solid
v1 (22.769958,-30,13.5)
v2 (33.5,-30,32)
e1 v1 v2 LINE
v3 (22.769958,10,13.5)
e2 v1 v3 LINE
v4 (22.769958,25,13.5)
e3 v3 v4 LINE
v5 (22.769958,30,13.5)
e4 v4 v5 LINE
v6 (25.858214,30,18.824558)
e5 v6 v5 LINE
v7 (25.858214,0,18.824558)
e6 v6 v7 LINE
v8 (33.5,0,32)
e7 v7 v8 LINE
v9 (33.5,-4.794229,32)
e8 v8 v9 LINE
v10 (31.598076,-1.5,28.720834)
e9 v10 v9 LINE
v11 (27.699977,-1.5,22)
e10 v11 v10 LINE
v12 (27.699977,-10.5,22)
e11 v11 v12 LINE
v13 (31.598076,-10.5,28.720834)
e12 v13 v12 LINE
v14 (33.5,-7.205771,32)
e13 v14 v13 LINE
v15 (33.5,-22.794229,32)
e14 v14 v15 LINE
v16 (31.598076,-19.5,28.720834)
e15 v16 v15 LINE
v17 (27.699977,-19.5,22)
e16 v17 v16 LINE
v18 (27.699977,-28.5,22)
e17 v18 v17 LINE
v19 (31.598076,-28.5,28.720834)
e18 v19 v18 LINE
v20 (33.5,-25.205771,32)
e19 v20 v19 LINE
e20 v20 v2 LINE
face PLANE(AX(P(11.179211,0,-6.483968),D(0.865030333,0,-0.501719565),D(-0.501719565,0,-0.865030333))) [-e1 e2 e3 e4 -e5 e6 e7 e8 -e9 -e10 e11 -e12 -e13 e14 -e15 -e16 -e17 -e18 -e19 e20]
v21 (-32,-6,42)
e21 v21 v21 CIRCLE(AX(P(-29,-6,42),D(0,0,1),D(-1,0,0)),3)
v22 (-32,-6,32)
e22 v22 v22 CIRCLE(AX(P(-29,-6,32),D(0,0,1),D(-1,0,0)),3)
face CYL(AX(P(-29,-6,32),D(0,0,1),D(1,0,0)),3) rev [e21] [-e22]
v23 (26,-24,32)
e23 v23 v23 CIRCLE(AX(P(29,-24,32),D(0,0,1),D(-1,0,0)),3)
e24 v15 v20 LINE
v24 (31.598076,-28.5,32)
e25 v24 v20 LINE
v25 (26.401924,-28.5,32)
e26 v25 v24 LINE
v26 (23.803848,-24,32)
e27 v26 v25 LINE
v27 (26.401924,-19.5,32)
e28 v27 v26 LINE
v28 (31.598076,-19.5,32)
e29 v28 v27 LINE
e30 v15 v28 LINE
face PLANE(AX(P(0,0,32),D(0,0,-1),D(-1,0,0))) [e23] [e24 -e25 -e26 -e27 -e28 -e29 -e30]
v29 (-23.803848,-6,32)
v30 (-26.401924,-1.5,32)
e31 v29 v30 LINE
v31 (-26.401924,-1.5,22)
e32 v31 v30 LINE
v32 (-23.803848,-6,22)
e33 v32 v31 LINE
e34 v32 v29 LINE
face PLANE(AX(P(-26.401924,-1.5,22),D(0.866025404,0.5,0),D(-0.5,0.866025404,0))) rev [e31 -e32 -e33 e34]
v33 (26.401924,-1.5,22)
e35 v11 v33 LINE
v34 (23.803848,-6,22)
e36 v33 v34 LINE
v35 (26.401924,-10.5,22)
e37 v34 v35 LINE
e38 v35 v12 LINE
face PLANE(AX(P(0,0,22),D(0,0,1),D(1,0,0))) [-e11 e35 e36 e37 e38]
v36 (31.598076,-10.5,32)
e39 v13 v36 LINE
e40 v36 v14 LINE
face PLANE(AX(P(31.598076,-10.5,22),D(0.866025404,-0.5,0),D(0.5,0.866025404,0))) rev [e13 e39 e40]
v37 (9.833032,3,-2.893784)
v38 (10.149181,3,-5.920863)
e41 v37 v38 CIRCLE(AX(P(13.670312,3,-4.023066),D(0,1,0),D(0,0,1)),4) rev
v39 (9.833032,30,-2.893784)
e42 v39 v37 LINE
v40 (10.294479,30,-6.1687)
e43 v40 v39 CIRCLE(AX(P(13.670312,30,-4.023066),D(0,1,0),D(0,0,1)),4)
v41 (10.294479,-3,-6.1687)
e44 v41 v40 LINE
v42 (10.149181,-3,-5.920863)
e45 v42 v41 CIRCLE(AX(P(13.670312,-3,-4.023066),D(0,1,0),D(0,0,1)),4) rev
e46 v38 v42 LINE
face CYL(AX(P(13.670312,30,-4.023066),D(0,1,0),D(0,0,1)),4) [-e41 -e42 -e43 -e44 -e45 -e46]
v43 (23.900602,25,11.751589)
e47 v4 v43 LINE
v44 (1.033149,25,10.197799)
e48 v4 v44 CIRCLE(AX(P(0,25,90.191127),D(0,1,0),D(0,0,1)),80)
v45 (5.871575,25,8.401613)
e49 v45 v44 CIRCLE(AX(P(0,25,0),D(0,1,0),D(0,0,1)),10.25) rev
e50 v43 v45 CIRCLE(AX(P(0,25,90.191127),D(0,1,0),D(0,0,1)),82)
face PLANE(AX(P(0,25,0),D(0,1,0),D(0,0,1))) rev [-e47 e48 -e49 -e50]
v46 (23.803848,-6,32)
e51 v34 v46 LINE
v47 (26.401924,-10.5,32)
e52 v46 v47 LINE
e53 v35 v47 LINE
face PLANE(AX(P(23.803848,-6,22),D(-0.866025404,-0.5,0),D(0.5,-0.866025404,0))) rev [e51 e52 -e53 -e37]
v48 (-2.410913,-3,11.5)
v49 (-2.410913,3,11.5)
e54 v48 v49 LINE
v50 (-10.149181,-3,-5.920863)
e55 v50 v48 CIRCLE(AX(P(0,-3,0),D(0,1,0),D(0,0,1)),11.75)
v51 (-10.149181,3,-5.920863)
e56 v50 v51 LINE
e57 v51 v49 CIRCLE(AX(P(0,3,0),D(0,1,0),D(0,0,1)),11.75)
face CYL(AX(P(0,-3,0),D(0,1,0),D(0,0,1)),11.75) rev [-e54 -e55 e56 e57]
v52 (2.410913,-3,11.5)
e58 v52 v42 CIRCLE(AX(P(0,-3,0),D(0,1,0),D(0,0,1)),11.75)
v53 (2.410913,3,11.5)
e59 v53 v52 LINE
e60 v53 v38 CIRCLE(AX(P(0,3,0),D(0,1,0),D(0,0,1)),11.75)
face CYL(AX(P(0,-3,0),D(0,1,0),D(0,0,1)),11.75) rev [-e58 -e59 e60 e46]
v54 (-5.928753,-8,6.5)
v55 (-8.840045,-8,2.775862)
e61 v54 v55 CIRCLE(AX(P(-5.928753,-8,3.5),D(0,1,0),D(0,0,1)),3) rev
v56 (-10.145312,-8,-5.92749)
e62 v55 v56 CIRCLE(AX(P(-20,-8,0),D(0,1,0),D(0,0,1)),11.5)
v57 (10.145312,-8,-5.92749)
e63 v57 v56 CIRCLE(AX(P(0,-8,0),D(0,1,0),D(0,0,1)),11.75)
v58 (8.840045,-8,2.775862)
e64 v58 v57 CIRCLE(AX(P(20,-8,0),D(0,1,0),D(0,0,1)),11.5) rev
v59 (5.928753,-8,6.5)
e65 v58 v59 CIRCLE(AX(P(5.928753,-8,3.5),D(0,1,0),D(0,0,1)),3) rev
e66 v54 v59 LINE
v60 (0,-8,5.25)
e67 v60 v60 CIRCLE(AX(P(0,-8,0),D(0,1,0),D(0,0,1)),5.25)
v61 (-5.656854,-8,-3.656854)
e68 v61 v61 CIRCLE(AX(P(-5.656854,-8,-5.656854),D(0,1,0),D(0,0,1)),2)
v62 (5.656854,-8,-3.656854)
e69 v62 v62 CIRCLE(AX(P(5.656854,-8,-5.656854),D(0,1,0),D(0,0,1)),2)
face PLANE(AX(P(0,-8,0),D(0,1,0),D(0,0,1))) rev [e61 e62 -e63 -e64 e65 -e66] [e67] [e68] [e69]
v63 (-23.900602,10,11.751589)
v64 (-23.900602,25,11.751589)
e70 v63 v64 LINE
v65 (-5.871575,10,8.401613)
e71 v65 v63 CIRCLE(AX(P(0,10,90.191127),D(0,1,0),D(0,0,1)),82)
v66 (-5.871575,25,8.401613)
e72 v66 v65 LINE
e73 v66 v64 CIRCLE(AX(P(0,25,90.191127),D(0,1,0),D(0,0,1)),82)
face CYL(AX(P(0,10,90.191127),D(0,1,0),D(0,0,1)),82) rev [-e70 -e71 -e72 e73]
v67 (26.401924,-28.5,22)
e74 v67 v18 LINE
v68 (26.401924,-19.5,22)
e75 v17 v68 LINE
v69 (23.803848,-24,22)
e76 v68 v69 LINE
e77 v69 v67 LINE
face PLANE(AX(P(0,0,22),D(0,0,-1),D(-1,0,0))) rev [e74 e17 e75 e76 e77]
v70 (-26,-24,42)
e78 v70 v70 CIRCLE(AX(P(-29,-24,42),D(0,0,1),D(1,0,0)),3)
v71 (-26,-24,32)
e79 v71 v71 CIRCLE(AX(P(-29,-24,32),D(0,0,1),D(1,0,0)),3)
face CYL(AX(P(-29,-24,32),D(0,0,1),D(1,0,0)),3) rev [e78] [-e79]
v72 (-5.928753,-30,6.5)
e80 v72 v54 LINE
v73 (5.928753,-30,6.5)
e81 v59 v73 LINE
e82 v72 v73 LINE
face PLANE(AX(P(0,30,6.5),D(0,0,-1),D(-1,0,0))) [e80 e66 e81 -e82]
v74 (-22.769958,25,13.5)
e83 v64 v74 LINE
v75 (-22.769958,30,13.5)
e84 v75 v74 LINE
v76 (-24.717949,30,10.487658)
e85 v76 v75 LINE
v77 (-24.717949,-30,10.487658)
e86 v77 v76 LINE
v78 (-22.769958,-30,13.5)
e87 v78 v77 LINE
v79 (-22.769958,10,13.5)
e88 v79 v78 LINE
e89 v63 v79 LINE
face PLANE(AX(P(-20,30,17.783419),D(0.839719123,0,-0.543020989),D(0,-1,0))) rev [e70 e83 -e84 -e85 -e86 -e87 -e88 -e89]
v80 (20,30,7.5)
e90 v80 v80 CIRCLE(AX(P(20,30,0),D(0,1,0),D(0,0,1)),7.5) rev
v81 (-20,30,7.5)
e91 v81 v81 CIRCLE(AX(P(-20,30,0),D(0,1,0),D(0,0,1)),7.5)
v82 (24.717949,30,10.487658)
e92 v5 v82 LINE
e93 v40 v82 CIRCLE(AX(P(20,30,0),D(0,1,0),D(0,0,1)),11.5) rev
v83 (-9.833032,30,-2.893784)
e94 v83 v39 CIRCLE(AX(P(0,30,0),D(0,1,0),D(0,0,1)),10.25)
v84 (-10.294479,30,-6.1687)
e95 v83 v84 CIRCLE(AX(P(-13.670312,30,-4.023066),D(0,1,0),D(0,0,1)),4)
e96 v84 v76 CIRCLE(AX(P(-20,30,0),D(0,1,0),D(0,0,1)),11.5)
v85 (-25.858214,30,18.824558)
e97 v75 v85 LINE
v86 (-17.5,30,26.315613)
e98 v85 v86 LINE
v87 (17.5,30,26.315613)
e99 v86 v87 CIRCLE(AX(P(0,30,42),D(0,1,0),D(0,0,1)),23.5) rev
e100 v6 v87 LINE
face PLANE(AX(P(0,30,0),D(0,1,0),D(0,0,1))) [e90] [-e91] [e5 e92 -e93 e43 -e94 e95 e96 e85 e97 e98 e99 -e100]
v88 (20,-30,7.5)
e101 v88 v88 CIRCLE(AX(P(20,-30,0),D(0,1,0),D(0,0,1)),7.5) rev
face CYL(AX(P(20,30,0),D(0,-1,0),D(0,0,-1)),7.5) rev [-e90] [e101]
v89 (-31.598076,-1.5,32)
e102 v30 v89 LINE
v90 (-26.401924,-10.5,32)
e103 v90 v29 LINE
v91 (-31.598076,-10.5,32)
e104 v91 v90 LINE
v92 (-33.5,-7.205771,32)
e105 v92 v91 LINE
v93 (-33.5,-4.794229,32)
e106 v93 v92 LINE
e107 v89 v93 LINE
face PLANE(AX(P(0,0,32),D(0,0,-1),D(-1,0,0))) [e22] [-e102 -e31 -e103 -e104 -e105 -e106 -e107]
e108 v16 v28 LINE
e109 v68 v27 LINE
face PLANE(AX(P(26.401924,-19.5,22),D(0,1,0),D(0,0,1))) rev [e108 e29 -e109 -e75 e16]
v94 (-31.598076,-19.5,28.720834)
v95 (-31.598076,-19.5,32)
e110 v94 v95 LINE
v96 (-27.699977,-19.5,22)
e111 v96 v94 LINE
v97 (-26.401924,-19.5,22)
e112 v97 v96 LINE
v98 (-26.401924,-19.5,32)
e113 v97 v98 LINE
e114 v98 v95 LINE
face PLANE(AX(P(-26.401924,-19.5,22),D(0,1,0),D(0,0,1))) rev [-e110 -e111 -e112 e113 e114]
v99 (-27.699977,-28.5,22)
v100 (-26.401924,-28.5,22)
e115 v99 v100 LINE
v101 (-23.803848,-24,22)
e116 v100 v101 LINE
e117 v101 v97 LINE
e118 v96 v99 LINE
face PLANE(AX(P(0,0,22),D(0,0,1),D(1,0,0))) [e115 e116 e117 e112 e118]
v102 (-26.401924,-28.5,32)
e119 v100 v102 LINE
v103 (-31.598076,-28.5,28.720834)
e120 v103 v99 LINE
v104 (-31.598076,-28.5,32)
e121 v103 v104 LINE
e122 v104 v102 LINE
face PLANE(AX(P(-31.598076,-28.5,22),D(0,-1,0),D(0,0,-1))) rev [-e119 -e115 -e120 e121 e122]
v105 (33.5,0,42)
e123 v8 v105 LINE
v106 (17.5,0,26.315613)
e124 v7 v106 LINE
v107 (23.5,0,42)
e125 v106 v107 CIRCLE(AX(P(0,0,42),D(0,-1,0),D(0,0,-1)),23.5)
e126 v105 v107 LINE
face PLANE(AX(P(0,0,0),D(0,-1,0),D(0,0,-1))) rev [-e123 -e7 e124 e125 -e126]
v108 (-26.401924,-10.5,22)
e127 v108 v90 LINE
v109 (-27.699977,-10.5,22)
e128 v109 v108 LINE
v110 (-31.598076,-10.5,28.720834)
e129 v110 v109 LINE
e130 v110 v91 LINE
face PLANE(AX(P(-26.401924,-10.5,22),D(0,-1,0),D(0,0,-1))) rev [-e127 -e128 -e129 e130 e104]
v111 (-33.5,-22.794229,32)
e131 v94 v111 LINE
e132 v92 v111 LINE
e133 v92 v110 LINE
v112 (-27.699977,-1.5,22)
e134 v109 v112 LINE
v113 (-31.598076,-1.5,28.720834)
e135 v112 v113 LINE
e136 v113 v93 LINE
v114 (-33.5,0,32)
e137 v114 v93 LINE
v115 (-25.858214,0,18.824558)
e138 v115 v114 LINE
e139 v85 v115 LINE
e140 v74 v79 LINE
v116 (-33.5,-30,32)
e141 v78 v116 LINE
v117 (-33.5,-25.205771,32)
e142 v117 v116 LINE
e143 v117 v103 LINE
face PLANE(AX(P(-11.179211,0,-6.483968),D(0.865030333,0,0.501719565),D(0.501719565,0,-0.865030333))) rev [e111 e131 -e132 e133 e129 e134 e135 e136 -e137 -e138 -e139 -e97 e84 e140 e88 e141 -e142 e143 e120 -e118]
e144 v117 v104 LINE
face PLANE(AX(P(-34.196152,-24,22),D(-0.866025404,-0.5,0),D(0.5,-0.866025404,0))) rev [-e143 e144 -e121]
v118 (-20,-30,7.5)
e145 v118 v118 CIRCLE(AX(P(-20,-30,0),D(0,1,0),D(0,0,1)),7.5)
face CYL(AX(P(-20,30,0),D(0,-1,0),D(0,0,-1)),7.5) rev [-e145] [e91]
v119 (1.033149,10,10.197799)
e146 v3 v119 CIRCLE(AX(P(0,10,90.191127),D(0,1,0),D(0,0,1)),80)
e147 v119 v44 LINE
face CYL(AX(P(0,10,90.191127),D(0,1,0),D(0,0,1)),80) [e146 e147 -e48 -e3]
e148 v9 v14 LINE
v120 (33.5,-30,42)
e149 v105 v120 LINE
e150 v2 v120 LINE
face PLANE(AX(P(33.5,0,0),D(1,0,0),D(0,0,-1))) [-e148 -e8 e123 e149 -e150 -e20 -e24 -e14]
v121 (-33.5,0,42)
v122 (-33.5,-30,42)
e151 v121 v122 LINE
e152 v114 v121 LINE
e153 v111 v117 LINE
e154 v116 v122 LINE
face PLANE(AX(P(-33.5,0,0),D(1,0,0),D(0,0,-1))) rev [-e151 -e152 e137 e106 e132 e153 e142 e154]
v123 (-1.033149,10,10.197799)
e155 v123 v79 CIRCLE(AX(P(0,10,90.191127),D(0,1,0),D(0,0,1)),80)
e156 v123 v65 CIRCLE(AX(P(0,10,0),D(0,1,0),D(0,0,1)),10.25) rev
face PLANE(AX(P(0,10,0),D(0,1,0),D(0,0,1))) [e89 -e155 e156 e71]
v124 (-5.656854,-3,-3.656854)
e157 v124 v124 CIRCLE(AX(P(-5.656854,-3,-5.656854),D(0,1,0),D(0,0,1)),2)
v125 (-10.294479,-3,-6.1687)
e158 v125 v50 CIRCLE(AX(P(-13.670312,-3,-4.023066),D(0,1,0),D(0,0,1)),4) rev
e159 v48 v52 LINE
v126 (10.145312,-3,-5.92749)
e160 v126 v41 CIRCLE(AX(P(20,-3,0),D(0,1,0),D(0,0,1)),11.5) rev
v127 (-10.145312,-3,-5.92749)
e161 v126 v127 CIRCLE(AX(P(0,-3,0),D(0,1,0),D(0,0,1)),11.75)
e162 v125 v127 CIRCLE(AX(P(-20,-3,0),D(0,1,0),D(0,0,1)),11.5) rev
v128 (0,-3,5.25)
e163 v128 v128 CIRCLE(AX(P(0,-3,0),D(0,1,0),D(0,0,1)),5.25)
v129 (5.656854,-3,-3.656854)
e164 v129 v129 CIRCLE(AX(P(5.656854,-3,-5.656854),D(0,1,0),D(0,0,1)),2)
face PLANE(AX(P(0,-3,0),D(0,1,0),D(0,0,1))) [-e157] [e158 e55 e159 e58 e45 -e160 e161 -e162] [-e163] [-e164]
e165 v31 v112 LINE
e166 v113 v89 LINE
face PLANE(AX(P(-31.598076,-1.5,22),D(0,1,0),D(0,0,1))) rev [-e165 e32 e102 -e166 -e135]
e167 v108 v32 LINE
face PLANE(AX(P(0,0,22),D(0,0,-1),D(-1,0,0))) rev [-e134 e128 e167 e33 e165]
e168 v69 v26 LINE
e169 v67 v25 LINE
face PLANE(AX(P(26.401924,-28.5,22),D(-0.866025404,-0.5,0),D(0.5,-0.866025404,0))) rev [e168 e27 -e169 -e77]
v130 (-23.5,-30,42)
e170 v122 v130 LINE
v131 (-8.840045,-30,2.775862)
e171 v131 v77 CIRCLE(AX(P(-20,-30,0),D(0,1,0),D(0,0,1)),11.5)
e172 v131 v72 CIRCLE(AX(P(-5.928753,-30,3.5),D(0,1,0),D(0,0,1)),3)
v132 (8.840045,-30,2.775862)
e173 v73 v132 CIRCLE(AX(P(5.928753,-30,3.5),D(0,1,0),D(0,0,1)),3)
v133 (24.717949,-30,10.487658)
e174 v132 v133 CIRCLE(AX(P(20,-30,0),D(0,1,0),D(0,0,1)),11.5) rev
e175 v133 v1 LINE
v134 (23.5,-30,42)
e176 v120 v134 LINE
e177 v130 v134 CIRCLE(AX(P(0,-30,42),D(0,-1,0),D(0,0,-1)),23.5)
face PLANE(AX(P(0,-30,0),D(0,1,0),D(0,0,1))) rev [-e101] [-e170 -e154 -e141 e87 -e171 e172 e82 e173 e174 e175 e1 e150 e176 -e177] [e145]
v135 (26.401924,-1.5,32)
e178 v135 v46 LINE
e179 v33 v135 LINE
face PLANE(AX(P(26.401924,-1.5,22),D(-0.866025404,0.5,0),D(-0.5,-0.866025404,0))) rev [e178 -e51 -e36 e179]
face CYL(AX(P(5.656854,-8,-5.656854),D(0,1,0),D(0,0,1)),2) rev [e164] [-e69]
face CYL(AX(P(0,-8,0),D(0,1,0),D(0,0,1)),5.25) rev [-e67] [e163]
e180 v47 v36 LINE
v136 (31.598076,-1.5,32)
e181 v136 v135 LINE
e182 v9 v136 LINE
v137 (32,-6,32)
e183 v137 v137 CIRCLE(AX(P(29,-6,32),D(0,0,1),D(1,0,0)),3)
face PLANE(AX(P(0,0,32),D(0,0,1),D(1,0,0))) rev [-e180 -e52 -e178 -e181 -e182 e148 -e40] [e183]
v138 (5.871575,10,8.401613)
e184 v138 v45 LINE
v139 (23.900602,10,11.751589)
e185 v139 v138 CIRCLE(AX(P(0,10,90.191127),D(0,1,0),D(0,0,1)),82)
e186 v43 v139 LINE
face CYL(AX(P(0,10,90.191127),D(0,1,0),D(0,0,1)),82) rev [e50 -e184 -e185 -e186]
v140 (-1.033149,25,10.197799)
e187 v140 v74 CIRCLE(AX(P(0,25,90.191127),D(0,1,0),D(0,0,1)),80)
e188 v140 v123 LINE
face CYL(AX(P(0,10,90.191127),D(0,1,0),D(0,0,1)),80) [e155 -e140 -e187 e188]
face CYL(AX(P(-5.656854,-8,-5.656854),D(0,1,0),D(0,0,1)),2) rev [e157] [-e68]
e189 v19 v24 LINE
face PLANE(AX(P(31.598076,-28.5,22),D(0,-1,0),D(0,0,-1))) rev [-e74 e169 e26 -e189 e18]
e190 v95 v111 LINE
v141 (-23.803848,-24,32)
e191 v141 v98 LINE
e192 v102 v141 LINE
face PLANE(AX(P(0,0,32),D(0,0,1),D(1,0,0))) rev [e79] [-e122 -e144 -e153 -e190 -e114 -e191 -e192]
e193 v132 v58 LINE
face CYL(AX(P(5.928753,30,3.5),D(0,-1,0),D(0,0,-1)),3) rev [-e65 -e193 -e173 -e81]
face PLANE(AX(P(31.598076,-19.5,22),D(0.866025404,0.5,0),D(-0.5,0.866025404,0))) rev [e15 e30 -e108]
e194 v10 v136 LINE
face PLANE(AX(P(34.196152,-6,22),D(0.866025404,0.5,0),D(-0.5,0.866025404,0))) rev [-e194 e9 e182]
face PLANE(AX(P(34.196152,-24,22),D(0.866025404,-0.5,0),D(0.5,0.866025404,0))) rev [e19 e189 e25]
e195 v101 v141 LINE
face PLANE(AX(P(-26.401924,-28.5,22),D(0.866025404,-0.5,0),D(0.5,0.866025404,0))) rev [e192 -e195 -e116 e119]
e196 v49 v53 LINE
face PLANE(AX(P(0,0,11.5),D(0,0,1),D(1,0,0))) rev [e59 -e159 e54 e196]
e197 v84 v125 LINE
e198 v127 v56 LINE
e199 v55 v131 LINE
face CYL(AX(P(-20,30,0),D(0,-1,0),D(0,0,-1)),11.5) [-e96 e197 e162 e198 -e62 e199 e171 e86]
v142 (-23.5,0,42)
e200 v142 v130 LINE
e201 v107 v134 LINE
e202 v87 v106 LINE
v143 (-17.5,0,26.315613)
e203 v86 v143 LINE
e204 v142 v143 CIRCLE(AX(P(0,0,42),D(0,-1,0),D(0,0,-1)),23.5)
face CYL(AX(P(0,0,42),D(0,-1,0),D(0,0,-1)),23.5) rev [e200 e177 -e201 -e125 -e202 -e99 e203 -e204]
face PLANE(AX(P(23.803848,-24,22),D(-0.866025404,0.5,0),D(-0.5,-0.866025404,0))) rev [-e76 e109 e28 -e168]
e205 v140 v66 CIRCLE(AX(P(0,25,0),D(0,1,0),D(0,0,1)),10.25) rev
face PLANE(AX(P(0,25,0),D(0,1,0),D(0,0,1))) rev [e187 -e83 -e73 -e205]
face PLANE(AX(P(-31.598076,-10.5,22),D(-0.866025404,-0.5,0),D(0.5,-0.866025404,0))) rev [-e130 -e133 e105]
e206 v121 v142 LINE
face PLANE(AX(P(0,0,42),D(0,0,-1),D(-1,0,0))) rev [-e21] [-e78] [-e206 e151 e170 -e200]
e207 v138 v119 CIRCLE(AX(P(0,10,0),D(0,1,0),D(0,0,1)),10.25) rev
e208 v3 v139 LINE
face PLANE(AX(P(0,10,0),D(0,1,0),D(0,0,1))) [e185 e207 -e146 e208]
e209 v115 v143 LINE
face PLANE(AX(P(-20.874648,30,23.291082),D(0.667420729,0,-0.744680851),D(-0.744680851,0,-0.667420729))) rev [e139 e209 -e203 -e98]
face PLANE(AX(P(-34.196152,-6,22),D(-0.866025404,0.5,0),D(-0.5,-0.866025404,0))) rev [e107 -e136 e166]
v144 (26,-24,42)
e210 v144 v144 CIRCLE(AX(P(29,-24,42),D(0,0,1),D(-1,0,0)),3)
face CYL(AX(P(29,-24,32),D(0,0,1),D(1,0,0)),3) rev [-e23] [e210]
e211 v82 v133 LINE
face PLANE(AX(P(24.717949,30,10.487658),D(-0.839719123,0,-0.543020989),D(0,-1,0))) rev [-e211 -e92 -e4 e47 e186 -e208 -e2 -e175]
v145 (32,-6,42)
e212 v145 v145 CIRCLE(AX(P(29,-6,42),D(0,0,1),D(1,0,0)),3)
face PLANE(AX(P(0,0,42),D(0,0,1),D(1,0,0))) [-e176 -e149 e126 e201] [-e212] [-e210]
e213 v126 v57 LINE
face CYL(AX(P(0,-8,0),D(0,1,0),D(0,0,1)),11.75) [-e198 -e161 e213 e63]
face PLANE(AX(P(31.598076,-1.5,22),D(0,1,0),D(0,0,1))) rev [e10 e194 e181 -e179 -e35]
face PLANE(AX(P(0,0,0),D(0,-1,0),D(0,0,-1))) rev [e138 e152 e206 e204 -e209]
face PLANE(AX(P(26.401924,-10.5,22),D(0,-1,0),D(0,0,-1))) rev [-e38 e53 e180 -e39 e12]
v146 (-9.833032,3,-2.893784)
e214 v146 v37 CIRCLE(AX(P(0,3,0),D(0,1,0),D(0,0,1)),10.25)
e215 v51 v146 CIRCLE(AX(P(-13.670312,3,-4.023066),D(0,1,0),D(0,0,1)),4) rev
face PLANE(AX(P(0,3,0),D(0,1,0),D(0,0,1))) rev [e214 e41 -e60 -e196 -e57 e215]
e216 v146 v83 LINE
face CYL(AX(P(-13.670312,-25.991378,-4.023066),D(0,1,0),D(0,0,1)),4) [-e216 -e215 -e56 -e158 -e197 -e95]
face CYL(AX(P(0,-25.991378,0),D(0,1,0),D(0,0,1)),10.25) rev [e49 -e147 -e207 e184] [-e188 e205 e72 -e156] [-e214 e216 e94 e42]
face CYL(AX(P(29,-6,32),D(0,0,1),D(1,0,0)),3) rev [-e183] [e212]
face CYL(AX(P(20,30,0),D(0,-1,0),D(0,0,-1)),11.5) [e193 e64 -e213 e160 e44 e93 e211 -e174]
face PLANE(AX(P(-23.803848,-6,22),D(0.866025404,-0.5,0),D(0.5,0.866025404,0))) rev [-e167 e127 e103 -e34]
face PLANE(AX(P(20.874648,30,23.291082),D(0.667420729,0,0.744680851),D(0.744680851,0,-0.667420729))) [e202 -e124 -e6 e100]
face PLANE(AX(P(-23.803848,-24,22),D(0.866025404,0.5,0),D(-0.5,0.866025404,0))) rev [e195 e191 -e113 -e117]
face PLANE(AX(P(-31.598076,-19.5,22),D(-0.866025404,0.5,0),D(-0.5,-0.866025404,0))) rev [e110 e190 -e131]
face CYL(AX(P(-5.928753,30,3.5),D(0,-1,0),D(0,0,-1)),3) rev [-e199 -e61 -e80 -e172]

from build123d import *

# Parameters (mm, degrees)
SKETCH1_R           = 11.5
SKETCH1_R_2         = 7.5
BOSS_EXTRUDE1_DEPTH = 30
FILLET1_R           = 3
SKETCH2_R           = 11.75
CUT_EXTRUDE3_DEPTH  = 3
SKETCH3_R           = 11.75
SKETCH3_R_2         = 5.25
SKETCH3_R_3         = 2
BOSS_EXTRUDE2_DEPTH = 5
SKETCH4_W           = 40
SKETCH4_H           = 60
BOSS_EXTRUDE3_DEPTH = 2
SKETCH5_R           = 10.25
CUT_EXTRUDE4_DEPTH  = 27
FILLET2_START       = -3
FILLET2_DEPTH       = 34
BOSS_EXTRUDE4_DEPTH = 30
BOSS_EXTRUDE5_DEPTH = 30
CUT_EXTRUDE5_DEPTH  = 15
SKETCH9_R           = 3
CUT_EXTRUDE6_DEPTH  = 10
CUT_EXTRUDE7_DEPTH  = 10


with BuildPart() as part:
    # Sketch1 → Boss-Extrude1 (new, symmetric)
    # profile 1 of 3: a face of its own
    with BuildSketch(Plane(origin=(0, 0, 0), x_dir=(1, 0, 0), z_dir=(0, 1, 0))):
        with Locations((-20, 0)):
            Circle(SKETCH1_R)
        with Locations(Location((-20, 0, 0), (0, 0, 270))):
            Circle(SKETCH1_R_2, mode=Mode.SUBTRACT)
    # profile 2 of 3: a face of its own
    with BuildSketch(Plane(origin=(0, 0, 0), x_dir=(1, 0, 0), z_dir=(0, 1, 0))):
        with Locations((20, 0)):
            Circle(SKETCH1_R)
        with Locations(Location((20, 0, 0), (0, 0, 270))):
            Circle(SKETCH1_R_2, mode=Mode.SUBTRACT)
    # profile 3 of 3: a face of its own
    with BuildSketch(Plane(origin=(0, 0, 0), x_dir=(1, 0, 0), z_dir=(0, 1, 0))):
        with BuildLine():
            ThreePointArc((-10.513167019, -6.5), (-14.638097353, -10.173494975), (-20, -11.5))
            Line((-20, -11.5), (20, -11.5))
            ThreePointArc((20, -11.5), (14.638097353, -10.173494975), (10.513167019, -6.5))
            Line((10.513167019, -6.5), (-10.513167019, -6.5))
        make_face()
    extrude(amount=BOSS_EXTRUDE1_DEPTH, both=True)

    # Fillet1
    fillet1_edges = [part.edges().sort_by_distance(p)[0] for p in [
        (-10.513167019, 0, 6.5),
        (10.513167019, 0, 6.5),
    ]]
    fillet(fillet1_edges, radius=FILLET1_R)

    # Sketch2 → Cut-Extrude3 (cut, symmetric)
    with BuildSketch(Plane(origin=(0, 0, 0), x_dir=(1, 0, 0), z_dir=(0, 1, 0))):
        Circle(SKETCH2_R)
    extrude(amount=CUT_EXTRUDE3_DEPTH, both=True, mode=Mode.SUBTRACT)

    # Sketch3 → Boss-Extrude2 (add)
    with BuildSketch(Plane(origin=(0, -3, 0), x_dir=(1, 0, 0), z_dir=(0, 1, 0))):
        Circle(SKETCH3_R)
        with Locations(Location((0, 0, 0), (0, 0, 270))):
            Circle(SKETCH3_R_2, mode=Mode.SUBTRACT)
        with Locations(Location((5.656854249, 5.656854249, 0), (0, 0, 270))):
            Circle(SKETCH3_R_3, mode=Mode.SUBTRACT)
        with Locations(Location((-5.656854249, 5.656854249, 0), (0, 0, 270))):
            Circle(SKETCH3_R_3, mode=Mode.SUBTRACT)
    extrude(amount=-BOSS_EXTRUDE2_DEPTH)

    # Sketch4 → Boss-Extrude3 (add)
    with BuildSketch(Plane.XY.offset(11.5)):
        Rectangle(SKETCH4_W, SKETCH4_H)
    extrude(amount=BOSS_EXTRUDE3_DEPTH)

    # Chamfer1
    # the kernel refuses this chamfer: 8 mm, written as the material it adds along each edge
    with BuildSketch(Plane(origin=(20, -30, 11.5), x_dir=(0.9777449098895067, 0, -0.20979726210120203), z_dir=(0, 1, 0))) as chamfer1_piece_1_section:
        with BuildLine():
            Line((5.051611198, 0.22627417), (-1.544518324, -6.369855352))
            Line((-1.544518324, -6.369855352), (-1.70095751, -6.33628779))
            ThreePointArc((-1.70095751, -6.33628779), (-0.843748586, -3.169588005), (-0.156439186, 0.033567562))
            Line((-0.156439186, 0.033567562), (0.033567562, 0.156439186))
            ThreePointArc((0.033567562, 0.156439186), (2.527924683, -0.095347808), (5.018043636, 0.382713356))
            Line((5.018043636, 0.382713356), (5.051611198, 0.22627417))
        make_face()
    chamfer1_piece_1 = extrude(amount=60, mode=Mode.PRIVATE)
    chamfer1_piece_1 = split(chamfer1_piece_1, bisect_by=Plane(origin=(20, -30, 13.5), z_dir=(0, 0, -1)), keep=Keep.TOP, mode=Mode.PRIVATE)
    add(chamfer1_piece_1)
    with BuildSketch(Plane(origin=(-20, -30, 11.5), x_dir=(-0.9777449098895067, 0, -0.20979726210120223), z_dir=(0, 1, 0))) as chamfer1_piece_2_section:
        with BuildLine():
            Line((5.051611198, -0.22627417), (-1.544518324, 6.369855352))
            Line((-1.544518324, 6.369855352), (-1.70095751, 6.33628779))
            ThreePointArc((-1.70095751, 6.33628779), (-0.843748586, 3.169588005), (-0.156439186, -0.033567562))
            Line((-0.156439186, -0.033567562), (0.033567562, -0.156439186))
            ThreePointArc((0.033567562, -0.156439186), (2.527924683, 0.095347808), (5.018043636, -0.382713356))
            Line((5.018043636, -0.382713356), (5.051611198, -0.22627417))
        make_face()
    chamfer1_piece_2 = extrude(amount=60, mode=Mode.PRIVATE)
    chamfer1_piece_2 = split(chamfer1_piece_2, bisect_by=Plane(origin=(-20, -30, 13.5), z_dir=(0, 0, -1)), keep=Keep.TOP, mode=Mode.PRIVATE)
    add(chamfer1_piece_2)

    # Sketch5 → Cut-Extrude4 (cut)
    with BuildSketch(Plane(origin=(0, 30, 0), x_dir=(1, 0, 0), z_dir=(0, 1, 0))):
        Circle(SKETCH5_R)
    extrude(amount=-CUT_EXTRUDE4_DEPTH, mode=Mode.SUBTRACT)

    # Fillet2: read off the stored shape, not the designer's step
    # Fillet2 outline → Fillet2 (cut)
    with BuildSketch(Plane(origin=(0, 0, 0), x_dir=(1, 0, 0), z_dir=(0, 1, 0)).offset(FILLET2_START)):
        with BuildLine():
            ThreePointArc((-9.833031798, 2.893783968), (-9.601199579, 3.588797381), (-9.3203125, 4.265474757))
            ThreePointArc((-9.3203125, 4.265474757), (-9.763069468, 5.239776072), (-10.294479167, 6.168700459))
            ThreePointArc((-10.294479167, 6.168700459), (-9.709438477, 4.581166738), (-9.833031798, 2.893783968))
        make_face()
        with BuildLine():
            ThreePointArc((10.294479167, 6.168700459), (9.763069468, 5.239776072), (9.3203125, 4.265474757))
            ThreePointArc((9.3203125, 4.265474757), (9.601199579, 3.588797381), (9.833031798, 2.893783968))
            ThreePointArc((9.833031798, 2.893783968), (9.709438477, 4.581166738), (10.294479167, 6.168700459))
        make_face()
    extrude(amount=FILLET2_DEPTH, mode=Mode.SUBTRACT)

    # Sketch6 → Boss-Extrude4 (add)
    with BuildSketch(Plane.XZ.offset(30)):
        with BuildLine():
            ThreePointArc((-23.5, 42), (0, 18.5), (23.5, 42))
            Line((23.5, 42), (33.5, 42))
            Line((33.5, 42), (33.5, 32))
            Line((33.5, 32), (22.769957826, 13.5))
            Line((22.769957826, 13.5), (-22.769957826, 13.5))
            Line((-22.769957826, 13.5), (-33.5, 32))
            Line((-33.5, 32), (-33.5, 42))
            Line((-33.5, 42), (-23.5, 42))
        make_face()
    extrude(amount=-BOSS_EXTRUDE4_DEPTH)

    # Sketch7 → Boss-Extrude5 (add)
    with BuildSketch(Plane(origin=(0, 0, 0), x_dir=(1, 0, 0), z_dir=(0, 1, 0))):
        with BuildLine():
            Line((0, -13.5), (0, -18.5))
            ThreePointArc((0, -18.5), (9.582977152, -20.542680761), (17.5, -26.315612859))
            Line((17.5, -26.315612859), (25.858213649, -18.824558077))
            Line((25.858213649, -18.824558077), (22.769957826, -13.5))
            Line((22.769957826, -13.5), (0, -13.5))
        make_face()
        with BuildLine():
            Line((-22.769957826, -13.5), (-25.858213649, -18.824558077))
            Line((-25.858213649, -18.824558077), (-17.5, -26.315612859))
            ThreePointArc((-17.5, -26.315612859), (-9.582977152, -20.542680761), (0, -18.5))
            Line((0, -18.5), (0, -13.5))
            Line((0, -13.5), (-22.769957826, -13.5))
        make_face()
    extrude(amount=BOSS_EXTRUDE5_DEPTH)

    # Sketch8 → Cut-Extrude5 (cut)
    with BuildSketch(Plane(origin=(0, 25, 0), x_dir=(1, 0, 0), z_dir=(0, 1, 0))):
        with BuildLine():
            Line((30.953633553, -14.257784453), (29.292282812, -15.746771207))
            ThreePointArc((29.292282812, -15.746771207), (0, -10.191127392), (-29.292282812, -15.746771207))
            Line((-29.292282812, -15.746771207), (-30.953633553, -14.257784453))
            ThreePointArc((-30.953633553, -14.257784453), (0, -8.191127392), (30.953633553, -14.257784453))
        make_face()
    extrude(amount=-CUT_EXTRUDE5_DEPTH, mode=Mode.SUBTRACT)

    # Sketch9 → Cut-Extrude6 (cut)
    with BuildSketch(Plane.XY.offset(42)):
        with Locations((29, -6)):
            Circle(SKETCH9_R)
        with Locations(Location((-29, -6, 0), (0, 0, 180))):
            Circle(SKETCH9_R)
        with Locations((-29, -24)):
            Circle(SKETCH9_R)
        with Locations(Location((29, -24, 0), (0, 0, 180))):
            Circle(SKETCH9_R)
    extrude(amount=-CUT_EXTRUDE6_DEPTH, mode=Mode.SUBTRACT)

    # Sketch10 → Cut-Extrude7 (cut)
    with BuildSketch(Plane.XY.offset(32)):
        Polygon((34.196152423, -6), (31.598076211, -1.5), (26.401923789, -1.5), (23.803847577, -6), (26.401923789, -10.5), (31.598076211, -10.5), align=None)
        Polygon((31.598076211, -19.5), (34.196152423, -24), (31.598076211, -28.5), (26.401923789, -28.5), (23.803847577, -24), (26.401923789, -19.5), align=None)
        Polygon((-34.196152423, -24), (-31.598076211, -28.5), (-26.401923789, -28.5), (-23.803847577, -24), (-26.401923789, -19.5), (-31.598076211, -19.5), align=None)
        Polygon((-31.598076211, -10.5), (-34.196152423, -6), (-31.598076211, -1.5), (-26.401923789, -1.5), (-23.803847577, -6), (-26.401923789, -10.5), align=None)
    extrude(amount=-CUT_EXTRUDE7_DEPTH, mode=Mode.SUBTRACT)


solid = part.part
